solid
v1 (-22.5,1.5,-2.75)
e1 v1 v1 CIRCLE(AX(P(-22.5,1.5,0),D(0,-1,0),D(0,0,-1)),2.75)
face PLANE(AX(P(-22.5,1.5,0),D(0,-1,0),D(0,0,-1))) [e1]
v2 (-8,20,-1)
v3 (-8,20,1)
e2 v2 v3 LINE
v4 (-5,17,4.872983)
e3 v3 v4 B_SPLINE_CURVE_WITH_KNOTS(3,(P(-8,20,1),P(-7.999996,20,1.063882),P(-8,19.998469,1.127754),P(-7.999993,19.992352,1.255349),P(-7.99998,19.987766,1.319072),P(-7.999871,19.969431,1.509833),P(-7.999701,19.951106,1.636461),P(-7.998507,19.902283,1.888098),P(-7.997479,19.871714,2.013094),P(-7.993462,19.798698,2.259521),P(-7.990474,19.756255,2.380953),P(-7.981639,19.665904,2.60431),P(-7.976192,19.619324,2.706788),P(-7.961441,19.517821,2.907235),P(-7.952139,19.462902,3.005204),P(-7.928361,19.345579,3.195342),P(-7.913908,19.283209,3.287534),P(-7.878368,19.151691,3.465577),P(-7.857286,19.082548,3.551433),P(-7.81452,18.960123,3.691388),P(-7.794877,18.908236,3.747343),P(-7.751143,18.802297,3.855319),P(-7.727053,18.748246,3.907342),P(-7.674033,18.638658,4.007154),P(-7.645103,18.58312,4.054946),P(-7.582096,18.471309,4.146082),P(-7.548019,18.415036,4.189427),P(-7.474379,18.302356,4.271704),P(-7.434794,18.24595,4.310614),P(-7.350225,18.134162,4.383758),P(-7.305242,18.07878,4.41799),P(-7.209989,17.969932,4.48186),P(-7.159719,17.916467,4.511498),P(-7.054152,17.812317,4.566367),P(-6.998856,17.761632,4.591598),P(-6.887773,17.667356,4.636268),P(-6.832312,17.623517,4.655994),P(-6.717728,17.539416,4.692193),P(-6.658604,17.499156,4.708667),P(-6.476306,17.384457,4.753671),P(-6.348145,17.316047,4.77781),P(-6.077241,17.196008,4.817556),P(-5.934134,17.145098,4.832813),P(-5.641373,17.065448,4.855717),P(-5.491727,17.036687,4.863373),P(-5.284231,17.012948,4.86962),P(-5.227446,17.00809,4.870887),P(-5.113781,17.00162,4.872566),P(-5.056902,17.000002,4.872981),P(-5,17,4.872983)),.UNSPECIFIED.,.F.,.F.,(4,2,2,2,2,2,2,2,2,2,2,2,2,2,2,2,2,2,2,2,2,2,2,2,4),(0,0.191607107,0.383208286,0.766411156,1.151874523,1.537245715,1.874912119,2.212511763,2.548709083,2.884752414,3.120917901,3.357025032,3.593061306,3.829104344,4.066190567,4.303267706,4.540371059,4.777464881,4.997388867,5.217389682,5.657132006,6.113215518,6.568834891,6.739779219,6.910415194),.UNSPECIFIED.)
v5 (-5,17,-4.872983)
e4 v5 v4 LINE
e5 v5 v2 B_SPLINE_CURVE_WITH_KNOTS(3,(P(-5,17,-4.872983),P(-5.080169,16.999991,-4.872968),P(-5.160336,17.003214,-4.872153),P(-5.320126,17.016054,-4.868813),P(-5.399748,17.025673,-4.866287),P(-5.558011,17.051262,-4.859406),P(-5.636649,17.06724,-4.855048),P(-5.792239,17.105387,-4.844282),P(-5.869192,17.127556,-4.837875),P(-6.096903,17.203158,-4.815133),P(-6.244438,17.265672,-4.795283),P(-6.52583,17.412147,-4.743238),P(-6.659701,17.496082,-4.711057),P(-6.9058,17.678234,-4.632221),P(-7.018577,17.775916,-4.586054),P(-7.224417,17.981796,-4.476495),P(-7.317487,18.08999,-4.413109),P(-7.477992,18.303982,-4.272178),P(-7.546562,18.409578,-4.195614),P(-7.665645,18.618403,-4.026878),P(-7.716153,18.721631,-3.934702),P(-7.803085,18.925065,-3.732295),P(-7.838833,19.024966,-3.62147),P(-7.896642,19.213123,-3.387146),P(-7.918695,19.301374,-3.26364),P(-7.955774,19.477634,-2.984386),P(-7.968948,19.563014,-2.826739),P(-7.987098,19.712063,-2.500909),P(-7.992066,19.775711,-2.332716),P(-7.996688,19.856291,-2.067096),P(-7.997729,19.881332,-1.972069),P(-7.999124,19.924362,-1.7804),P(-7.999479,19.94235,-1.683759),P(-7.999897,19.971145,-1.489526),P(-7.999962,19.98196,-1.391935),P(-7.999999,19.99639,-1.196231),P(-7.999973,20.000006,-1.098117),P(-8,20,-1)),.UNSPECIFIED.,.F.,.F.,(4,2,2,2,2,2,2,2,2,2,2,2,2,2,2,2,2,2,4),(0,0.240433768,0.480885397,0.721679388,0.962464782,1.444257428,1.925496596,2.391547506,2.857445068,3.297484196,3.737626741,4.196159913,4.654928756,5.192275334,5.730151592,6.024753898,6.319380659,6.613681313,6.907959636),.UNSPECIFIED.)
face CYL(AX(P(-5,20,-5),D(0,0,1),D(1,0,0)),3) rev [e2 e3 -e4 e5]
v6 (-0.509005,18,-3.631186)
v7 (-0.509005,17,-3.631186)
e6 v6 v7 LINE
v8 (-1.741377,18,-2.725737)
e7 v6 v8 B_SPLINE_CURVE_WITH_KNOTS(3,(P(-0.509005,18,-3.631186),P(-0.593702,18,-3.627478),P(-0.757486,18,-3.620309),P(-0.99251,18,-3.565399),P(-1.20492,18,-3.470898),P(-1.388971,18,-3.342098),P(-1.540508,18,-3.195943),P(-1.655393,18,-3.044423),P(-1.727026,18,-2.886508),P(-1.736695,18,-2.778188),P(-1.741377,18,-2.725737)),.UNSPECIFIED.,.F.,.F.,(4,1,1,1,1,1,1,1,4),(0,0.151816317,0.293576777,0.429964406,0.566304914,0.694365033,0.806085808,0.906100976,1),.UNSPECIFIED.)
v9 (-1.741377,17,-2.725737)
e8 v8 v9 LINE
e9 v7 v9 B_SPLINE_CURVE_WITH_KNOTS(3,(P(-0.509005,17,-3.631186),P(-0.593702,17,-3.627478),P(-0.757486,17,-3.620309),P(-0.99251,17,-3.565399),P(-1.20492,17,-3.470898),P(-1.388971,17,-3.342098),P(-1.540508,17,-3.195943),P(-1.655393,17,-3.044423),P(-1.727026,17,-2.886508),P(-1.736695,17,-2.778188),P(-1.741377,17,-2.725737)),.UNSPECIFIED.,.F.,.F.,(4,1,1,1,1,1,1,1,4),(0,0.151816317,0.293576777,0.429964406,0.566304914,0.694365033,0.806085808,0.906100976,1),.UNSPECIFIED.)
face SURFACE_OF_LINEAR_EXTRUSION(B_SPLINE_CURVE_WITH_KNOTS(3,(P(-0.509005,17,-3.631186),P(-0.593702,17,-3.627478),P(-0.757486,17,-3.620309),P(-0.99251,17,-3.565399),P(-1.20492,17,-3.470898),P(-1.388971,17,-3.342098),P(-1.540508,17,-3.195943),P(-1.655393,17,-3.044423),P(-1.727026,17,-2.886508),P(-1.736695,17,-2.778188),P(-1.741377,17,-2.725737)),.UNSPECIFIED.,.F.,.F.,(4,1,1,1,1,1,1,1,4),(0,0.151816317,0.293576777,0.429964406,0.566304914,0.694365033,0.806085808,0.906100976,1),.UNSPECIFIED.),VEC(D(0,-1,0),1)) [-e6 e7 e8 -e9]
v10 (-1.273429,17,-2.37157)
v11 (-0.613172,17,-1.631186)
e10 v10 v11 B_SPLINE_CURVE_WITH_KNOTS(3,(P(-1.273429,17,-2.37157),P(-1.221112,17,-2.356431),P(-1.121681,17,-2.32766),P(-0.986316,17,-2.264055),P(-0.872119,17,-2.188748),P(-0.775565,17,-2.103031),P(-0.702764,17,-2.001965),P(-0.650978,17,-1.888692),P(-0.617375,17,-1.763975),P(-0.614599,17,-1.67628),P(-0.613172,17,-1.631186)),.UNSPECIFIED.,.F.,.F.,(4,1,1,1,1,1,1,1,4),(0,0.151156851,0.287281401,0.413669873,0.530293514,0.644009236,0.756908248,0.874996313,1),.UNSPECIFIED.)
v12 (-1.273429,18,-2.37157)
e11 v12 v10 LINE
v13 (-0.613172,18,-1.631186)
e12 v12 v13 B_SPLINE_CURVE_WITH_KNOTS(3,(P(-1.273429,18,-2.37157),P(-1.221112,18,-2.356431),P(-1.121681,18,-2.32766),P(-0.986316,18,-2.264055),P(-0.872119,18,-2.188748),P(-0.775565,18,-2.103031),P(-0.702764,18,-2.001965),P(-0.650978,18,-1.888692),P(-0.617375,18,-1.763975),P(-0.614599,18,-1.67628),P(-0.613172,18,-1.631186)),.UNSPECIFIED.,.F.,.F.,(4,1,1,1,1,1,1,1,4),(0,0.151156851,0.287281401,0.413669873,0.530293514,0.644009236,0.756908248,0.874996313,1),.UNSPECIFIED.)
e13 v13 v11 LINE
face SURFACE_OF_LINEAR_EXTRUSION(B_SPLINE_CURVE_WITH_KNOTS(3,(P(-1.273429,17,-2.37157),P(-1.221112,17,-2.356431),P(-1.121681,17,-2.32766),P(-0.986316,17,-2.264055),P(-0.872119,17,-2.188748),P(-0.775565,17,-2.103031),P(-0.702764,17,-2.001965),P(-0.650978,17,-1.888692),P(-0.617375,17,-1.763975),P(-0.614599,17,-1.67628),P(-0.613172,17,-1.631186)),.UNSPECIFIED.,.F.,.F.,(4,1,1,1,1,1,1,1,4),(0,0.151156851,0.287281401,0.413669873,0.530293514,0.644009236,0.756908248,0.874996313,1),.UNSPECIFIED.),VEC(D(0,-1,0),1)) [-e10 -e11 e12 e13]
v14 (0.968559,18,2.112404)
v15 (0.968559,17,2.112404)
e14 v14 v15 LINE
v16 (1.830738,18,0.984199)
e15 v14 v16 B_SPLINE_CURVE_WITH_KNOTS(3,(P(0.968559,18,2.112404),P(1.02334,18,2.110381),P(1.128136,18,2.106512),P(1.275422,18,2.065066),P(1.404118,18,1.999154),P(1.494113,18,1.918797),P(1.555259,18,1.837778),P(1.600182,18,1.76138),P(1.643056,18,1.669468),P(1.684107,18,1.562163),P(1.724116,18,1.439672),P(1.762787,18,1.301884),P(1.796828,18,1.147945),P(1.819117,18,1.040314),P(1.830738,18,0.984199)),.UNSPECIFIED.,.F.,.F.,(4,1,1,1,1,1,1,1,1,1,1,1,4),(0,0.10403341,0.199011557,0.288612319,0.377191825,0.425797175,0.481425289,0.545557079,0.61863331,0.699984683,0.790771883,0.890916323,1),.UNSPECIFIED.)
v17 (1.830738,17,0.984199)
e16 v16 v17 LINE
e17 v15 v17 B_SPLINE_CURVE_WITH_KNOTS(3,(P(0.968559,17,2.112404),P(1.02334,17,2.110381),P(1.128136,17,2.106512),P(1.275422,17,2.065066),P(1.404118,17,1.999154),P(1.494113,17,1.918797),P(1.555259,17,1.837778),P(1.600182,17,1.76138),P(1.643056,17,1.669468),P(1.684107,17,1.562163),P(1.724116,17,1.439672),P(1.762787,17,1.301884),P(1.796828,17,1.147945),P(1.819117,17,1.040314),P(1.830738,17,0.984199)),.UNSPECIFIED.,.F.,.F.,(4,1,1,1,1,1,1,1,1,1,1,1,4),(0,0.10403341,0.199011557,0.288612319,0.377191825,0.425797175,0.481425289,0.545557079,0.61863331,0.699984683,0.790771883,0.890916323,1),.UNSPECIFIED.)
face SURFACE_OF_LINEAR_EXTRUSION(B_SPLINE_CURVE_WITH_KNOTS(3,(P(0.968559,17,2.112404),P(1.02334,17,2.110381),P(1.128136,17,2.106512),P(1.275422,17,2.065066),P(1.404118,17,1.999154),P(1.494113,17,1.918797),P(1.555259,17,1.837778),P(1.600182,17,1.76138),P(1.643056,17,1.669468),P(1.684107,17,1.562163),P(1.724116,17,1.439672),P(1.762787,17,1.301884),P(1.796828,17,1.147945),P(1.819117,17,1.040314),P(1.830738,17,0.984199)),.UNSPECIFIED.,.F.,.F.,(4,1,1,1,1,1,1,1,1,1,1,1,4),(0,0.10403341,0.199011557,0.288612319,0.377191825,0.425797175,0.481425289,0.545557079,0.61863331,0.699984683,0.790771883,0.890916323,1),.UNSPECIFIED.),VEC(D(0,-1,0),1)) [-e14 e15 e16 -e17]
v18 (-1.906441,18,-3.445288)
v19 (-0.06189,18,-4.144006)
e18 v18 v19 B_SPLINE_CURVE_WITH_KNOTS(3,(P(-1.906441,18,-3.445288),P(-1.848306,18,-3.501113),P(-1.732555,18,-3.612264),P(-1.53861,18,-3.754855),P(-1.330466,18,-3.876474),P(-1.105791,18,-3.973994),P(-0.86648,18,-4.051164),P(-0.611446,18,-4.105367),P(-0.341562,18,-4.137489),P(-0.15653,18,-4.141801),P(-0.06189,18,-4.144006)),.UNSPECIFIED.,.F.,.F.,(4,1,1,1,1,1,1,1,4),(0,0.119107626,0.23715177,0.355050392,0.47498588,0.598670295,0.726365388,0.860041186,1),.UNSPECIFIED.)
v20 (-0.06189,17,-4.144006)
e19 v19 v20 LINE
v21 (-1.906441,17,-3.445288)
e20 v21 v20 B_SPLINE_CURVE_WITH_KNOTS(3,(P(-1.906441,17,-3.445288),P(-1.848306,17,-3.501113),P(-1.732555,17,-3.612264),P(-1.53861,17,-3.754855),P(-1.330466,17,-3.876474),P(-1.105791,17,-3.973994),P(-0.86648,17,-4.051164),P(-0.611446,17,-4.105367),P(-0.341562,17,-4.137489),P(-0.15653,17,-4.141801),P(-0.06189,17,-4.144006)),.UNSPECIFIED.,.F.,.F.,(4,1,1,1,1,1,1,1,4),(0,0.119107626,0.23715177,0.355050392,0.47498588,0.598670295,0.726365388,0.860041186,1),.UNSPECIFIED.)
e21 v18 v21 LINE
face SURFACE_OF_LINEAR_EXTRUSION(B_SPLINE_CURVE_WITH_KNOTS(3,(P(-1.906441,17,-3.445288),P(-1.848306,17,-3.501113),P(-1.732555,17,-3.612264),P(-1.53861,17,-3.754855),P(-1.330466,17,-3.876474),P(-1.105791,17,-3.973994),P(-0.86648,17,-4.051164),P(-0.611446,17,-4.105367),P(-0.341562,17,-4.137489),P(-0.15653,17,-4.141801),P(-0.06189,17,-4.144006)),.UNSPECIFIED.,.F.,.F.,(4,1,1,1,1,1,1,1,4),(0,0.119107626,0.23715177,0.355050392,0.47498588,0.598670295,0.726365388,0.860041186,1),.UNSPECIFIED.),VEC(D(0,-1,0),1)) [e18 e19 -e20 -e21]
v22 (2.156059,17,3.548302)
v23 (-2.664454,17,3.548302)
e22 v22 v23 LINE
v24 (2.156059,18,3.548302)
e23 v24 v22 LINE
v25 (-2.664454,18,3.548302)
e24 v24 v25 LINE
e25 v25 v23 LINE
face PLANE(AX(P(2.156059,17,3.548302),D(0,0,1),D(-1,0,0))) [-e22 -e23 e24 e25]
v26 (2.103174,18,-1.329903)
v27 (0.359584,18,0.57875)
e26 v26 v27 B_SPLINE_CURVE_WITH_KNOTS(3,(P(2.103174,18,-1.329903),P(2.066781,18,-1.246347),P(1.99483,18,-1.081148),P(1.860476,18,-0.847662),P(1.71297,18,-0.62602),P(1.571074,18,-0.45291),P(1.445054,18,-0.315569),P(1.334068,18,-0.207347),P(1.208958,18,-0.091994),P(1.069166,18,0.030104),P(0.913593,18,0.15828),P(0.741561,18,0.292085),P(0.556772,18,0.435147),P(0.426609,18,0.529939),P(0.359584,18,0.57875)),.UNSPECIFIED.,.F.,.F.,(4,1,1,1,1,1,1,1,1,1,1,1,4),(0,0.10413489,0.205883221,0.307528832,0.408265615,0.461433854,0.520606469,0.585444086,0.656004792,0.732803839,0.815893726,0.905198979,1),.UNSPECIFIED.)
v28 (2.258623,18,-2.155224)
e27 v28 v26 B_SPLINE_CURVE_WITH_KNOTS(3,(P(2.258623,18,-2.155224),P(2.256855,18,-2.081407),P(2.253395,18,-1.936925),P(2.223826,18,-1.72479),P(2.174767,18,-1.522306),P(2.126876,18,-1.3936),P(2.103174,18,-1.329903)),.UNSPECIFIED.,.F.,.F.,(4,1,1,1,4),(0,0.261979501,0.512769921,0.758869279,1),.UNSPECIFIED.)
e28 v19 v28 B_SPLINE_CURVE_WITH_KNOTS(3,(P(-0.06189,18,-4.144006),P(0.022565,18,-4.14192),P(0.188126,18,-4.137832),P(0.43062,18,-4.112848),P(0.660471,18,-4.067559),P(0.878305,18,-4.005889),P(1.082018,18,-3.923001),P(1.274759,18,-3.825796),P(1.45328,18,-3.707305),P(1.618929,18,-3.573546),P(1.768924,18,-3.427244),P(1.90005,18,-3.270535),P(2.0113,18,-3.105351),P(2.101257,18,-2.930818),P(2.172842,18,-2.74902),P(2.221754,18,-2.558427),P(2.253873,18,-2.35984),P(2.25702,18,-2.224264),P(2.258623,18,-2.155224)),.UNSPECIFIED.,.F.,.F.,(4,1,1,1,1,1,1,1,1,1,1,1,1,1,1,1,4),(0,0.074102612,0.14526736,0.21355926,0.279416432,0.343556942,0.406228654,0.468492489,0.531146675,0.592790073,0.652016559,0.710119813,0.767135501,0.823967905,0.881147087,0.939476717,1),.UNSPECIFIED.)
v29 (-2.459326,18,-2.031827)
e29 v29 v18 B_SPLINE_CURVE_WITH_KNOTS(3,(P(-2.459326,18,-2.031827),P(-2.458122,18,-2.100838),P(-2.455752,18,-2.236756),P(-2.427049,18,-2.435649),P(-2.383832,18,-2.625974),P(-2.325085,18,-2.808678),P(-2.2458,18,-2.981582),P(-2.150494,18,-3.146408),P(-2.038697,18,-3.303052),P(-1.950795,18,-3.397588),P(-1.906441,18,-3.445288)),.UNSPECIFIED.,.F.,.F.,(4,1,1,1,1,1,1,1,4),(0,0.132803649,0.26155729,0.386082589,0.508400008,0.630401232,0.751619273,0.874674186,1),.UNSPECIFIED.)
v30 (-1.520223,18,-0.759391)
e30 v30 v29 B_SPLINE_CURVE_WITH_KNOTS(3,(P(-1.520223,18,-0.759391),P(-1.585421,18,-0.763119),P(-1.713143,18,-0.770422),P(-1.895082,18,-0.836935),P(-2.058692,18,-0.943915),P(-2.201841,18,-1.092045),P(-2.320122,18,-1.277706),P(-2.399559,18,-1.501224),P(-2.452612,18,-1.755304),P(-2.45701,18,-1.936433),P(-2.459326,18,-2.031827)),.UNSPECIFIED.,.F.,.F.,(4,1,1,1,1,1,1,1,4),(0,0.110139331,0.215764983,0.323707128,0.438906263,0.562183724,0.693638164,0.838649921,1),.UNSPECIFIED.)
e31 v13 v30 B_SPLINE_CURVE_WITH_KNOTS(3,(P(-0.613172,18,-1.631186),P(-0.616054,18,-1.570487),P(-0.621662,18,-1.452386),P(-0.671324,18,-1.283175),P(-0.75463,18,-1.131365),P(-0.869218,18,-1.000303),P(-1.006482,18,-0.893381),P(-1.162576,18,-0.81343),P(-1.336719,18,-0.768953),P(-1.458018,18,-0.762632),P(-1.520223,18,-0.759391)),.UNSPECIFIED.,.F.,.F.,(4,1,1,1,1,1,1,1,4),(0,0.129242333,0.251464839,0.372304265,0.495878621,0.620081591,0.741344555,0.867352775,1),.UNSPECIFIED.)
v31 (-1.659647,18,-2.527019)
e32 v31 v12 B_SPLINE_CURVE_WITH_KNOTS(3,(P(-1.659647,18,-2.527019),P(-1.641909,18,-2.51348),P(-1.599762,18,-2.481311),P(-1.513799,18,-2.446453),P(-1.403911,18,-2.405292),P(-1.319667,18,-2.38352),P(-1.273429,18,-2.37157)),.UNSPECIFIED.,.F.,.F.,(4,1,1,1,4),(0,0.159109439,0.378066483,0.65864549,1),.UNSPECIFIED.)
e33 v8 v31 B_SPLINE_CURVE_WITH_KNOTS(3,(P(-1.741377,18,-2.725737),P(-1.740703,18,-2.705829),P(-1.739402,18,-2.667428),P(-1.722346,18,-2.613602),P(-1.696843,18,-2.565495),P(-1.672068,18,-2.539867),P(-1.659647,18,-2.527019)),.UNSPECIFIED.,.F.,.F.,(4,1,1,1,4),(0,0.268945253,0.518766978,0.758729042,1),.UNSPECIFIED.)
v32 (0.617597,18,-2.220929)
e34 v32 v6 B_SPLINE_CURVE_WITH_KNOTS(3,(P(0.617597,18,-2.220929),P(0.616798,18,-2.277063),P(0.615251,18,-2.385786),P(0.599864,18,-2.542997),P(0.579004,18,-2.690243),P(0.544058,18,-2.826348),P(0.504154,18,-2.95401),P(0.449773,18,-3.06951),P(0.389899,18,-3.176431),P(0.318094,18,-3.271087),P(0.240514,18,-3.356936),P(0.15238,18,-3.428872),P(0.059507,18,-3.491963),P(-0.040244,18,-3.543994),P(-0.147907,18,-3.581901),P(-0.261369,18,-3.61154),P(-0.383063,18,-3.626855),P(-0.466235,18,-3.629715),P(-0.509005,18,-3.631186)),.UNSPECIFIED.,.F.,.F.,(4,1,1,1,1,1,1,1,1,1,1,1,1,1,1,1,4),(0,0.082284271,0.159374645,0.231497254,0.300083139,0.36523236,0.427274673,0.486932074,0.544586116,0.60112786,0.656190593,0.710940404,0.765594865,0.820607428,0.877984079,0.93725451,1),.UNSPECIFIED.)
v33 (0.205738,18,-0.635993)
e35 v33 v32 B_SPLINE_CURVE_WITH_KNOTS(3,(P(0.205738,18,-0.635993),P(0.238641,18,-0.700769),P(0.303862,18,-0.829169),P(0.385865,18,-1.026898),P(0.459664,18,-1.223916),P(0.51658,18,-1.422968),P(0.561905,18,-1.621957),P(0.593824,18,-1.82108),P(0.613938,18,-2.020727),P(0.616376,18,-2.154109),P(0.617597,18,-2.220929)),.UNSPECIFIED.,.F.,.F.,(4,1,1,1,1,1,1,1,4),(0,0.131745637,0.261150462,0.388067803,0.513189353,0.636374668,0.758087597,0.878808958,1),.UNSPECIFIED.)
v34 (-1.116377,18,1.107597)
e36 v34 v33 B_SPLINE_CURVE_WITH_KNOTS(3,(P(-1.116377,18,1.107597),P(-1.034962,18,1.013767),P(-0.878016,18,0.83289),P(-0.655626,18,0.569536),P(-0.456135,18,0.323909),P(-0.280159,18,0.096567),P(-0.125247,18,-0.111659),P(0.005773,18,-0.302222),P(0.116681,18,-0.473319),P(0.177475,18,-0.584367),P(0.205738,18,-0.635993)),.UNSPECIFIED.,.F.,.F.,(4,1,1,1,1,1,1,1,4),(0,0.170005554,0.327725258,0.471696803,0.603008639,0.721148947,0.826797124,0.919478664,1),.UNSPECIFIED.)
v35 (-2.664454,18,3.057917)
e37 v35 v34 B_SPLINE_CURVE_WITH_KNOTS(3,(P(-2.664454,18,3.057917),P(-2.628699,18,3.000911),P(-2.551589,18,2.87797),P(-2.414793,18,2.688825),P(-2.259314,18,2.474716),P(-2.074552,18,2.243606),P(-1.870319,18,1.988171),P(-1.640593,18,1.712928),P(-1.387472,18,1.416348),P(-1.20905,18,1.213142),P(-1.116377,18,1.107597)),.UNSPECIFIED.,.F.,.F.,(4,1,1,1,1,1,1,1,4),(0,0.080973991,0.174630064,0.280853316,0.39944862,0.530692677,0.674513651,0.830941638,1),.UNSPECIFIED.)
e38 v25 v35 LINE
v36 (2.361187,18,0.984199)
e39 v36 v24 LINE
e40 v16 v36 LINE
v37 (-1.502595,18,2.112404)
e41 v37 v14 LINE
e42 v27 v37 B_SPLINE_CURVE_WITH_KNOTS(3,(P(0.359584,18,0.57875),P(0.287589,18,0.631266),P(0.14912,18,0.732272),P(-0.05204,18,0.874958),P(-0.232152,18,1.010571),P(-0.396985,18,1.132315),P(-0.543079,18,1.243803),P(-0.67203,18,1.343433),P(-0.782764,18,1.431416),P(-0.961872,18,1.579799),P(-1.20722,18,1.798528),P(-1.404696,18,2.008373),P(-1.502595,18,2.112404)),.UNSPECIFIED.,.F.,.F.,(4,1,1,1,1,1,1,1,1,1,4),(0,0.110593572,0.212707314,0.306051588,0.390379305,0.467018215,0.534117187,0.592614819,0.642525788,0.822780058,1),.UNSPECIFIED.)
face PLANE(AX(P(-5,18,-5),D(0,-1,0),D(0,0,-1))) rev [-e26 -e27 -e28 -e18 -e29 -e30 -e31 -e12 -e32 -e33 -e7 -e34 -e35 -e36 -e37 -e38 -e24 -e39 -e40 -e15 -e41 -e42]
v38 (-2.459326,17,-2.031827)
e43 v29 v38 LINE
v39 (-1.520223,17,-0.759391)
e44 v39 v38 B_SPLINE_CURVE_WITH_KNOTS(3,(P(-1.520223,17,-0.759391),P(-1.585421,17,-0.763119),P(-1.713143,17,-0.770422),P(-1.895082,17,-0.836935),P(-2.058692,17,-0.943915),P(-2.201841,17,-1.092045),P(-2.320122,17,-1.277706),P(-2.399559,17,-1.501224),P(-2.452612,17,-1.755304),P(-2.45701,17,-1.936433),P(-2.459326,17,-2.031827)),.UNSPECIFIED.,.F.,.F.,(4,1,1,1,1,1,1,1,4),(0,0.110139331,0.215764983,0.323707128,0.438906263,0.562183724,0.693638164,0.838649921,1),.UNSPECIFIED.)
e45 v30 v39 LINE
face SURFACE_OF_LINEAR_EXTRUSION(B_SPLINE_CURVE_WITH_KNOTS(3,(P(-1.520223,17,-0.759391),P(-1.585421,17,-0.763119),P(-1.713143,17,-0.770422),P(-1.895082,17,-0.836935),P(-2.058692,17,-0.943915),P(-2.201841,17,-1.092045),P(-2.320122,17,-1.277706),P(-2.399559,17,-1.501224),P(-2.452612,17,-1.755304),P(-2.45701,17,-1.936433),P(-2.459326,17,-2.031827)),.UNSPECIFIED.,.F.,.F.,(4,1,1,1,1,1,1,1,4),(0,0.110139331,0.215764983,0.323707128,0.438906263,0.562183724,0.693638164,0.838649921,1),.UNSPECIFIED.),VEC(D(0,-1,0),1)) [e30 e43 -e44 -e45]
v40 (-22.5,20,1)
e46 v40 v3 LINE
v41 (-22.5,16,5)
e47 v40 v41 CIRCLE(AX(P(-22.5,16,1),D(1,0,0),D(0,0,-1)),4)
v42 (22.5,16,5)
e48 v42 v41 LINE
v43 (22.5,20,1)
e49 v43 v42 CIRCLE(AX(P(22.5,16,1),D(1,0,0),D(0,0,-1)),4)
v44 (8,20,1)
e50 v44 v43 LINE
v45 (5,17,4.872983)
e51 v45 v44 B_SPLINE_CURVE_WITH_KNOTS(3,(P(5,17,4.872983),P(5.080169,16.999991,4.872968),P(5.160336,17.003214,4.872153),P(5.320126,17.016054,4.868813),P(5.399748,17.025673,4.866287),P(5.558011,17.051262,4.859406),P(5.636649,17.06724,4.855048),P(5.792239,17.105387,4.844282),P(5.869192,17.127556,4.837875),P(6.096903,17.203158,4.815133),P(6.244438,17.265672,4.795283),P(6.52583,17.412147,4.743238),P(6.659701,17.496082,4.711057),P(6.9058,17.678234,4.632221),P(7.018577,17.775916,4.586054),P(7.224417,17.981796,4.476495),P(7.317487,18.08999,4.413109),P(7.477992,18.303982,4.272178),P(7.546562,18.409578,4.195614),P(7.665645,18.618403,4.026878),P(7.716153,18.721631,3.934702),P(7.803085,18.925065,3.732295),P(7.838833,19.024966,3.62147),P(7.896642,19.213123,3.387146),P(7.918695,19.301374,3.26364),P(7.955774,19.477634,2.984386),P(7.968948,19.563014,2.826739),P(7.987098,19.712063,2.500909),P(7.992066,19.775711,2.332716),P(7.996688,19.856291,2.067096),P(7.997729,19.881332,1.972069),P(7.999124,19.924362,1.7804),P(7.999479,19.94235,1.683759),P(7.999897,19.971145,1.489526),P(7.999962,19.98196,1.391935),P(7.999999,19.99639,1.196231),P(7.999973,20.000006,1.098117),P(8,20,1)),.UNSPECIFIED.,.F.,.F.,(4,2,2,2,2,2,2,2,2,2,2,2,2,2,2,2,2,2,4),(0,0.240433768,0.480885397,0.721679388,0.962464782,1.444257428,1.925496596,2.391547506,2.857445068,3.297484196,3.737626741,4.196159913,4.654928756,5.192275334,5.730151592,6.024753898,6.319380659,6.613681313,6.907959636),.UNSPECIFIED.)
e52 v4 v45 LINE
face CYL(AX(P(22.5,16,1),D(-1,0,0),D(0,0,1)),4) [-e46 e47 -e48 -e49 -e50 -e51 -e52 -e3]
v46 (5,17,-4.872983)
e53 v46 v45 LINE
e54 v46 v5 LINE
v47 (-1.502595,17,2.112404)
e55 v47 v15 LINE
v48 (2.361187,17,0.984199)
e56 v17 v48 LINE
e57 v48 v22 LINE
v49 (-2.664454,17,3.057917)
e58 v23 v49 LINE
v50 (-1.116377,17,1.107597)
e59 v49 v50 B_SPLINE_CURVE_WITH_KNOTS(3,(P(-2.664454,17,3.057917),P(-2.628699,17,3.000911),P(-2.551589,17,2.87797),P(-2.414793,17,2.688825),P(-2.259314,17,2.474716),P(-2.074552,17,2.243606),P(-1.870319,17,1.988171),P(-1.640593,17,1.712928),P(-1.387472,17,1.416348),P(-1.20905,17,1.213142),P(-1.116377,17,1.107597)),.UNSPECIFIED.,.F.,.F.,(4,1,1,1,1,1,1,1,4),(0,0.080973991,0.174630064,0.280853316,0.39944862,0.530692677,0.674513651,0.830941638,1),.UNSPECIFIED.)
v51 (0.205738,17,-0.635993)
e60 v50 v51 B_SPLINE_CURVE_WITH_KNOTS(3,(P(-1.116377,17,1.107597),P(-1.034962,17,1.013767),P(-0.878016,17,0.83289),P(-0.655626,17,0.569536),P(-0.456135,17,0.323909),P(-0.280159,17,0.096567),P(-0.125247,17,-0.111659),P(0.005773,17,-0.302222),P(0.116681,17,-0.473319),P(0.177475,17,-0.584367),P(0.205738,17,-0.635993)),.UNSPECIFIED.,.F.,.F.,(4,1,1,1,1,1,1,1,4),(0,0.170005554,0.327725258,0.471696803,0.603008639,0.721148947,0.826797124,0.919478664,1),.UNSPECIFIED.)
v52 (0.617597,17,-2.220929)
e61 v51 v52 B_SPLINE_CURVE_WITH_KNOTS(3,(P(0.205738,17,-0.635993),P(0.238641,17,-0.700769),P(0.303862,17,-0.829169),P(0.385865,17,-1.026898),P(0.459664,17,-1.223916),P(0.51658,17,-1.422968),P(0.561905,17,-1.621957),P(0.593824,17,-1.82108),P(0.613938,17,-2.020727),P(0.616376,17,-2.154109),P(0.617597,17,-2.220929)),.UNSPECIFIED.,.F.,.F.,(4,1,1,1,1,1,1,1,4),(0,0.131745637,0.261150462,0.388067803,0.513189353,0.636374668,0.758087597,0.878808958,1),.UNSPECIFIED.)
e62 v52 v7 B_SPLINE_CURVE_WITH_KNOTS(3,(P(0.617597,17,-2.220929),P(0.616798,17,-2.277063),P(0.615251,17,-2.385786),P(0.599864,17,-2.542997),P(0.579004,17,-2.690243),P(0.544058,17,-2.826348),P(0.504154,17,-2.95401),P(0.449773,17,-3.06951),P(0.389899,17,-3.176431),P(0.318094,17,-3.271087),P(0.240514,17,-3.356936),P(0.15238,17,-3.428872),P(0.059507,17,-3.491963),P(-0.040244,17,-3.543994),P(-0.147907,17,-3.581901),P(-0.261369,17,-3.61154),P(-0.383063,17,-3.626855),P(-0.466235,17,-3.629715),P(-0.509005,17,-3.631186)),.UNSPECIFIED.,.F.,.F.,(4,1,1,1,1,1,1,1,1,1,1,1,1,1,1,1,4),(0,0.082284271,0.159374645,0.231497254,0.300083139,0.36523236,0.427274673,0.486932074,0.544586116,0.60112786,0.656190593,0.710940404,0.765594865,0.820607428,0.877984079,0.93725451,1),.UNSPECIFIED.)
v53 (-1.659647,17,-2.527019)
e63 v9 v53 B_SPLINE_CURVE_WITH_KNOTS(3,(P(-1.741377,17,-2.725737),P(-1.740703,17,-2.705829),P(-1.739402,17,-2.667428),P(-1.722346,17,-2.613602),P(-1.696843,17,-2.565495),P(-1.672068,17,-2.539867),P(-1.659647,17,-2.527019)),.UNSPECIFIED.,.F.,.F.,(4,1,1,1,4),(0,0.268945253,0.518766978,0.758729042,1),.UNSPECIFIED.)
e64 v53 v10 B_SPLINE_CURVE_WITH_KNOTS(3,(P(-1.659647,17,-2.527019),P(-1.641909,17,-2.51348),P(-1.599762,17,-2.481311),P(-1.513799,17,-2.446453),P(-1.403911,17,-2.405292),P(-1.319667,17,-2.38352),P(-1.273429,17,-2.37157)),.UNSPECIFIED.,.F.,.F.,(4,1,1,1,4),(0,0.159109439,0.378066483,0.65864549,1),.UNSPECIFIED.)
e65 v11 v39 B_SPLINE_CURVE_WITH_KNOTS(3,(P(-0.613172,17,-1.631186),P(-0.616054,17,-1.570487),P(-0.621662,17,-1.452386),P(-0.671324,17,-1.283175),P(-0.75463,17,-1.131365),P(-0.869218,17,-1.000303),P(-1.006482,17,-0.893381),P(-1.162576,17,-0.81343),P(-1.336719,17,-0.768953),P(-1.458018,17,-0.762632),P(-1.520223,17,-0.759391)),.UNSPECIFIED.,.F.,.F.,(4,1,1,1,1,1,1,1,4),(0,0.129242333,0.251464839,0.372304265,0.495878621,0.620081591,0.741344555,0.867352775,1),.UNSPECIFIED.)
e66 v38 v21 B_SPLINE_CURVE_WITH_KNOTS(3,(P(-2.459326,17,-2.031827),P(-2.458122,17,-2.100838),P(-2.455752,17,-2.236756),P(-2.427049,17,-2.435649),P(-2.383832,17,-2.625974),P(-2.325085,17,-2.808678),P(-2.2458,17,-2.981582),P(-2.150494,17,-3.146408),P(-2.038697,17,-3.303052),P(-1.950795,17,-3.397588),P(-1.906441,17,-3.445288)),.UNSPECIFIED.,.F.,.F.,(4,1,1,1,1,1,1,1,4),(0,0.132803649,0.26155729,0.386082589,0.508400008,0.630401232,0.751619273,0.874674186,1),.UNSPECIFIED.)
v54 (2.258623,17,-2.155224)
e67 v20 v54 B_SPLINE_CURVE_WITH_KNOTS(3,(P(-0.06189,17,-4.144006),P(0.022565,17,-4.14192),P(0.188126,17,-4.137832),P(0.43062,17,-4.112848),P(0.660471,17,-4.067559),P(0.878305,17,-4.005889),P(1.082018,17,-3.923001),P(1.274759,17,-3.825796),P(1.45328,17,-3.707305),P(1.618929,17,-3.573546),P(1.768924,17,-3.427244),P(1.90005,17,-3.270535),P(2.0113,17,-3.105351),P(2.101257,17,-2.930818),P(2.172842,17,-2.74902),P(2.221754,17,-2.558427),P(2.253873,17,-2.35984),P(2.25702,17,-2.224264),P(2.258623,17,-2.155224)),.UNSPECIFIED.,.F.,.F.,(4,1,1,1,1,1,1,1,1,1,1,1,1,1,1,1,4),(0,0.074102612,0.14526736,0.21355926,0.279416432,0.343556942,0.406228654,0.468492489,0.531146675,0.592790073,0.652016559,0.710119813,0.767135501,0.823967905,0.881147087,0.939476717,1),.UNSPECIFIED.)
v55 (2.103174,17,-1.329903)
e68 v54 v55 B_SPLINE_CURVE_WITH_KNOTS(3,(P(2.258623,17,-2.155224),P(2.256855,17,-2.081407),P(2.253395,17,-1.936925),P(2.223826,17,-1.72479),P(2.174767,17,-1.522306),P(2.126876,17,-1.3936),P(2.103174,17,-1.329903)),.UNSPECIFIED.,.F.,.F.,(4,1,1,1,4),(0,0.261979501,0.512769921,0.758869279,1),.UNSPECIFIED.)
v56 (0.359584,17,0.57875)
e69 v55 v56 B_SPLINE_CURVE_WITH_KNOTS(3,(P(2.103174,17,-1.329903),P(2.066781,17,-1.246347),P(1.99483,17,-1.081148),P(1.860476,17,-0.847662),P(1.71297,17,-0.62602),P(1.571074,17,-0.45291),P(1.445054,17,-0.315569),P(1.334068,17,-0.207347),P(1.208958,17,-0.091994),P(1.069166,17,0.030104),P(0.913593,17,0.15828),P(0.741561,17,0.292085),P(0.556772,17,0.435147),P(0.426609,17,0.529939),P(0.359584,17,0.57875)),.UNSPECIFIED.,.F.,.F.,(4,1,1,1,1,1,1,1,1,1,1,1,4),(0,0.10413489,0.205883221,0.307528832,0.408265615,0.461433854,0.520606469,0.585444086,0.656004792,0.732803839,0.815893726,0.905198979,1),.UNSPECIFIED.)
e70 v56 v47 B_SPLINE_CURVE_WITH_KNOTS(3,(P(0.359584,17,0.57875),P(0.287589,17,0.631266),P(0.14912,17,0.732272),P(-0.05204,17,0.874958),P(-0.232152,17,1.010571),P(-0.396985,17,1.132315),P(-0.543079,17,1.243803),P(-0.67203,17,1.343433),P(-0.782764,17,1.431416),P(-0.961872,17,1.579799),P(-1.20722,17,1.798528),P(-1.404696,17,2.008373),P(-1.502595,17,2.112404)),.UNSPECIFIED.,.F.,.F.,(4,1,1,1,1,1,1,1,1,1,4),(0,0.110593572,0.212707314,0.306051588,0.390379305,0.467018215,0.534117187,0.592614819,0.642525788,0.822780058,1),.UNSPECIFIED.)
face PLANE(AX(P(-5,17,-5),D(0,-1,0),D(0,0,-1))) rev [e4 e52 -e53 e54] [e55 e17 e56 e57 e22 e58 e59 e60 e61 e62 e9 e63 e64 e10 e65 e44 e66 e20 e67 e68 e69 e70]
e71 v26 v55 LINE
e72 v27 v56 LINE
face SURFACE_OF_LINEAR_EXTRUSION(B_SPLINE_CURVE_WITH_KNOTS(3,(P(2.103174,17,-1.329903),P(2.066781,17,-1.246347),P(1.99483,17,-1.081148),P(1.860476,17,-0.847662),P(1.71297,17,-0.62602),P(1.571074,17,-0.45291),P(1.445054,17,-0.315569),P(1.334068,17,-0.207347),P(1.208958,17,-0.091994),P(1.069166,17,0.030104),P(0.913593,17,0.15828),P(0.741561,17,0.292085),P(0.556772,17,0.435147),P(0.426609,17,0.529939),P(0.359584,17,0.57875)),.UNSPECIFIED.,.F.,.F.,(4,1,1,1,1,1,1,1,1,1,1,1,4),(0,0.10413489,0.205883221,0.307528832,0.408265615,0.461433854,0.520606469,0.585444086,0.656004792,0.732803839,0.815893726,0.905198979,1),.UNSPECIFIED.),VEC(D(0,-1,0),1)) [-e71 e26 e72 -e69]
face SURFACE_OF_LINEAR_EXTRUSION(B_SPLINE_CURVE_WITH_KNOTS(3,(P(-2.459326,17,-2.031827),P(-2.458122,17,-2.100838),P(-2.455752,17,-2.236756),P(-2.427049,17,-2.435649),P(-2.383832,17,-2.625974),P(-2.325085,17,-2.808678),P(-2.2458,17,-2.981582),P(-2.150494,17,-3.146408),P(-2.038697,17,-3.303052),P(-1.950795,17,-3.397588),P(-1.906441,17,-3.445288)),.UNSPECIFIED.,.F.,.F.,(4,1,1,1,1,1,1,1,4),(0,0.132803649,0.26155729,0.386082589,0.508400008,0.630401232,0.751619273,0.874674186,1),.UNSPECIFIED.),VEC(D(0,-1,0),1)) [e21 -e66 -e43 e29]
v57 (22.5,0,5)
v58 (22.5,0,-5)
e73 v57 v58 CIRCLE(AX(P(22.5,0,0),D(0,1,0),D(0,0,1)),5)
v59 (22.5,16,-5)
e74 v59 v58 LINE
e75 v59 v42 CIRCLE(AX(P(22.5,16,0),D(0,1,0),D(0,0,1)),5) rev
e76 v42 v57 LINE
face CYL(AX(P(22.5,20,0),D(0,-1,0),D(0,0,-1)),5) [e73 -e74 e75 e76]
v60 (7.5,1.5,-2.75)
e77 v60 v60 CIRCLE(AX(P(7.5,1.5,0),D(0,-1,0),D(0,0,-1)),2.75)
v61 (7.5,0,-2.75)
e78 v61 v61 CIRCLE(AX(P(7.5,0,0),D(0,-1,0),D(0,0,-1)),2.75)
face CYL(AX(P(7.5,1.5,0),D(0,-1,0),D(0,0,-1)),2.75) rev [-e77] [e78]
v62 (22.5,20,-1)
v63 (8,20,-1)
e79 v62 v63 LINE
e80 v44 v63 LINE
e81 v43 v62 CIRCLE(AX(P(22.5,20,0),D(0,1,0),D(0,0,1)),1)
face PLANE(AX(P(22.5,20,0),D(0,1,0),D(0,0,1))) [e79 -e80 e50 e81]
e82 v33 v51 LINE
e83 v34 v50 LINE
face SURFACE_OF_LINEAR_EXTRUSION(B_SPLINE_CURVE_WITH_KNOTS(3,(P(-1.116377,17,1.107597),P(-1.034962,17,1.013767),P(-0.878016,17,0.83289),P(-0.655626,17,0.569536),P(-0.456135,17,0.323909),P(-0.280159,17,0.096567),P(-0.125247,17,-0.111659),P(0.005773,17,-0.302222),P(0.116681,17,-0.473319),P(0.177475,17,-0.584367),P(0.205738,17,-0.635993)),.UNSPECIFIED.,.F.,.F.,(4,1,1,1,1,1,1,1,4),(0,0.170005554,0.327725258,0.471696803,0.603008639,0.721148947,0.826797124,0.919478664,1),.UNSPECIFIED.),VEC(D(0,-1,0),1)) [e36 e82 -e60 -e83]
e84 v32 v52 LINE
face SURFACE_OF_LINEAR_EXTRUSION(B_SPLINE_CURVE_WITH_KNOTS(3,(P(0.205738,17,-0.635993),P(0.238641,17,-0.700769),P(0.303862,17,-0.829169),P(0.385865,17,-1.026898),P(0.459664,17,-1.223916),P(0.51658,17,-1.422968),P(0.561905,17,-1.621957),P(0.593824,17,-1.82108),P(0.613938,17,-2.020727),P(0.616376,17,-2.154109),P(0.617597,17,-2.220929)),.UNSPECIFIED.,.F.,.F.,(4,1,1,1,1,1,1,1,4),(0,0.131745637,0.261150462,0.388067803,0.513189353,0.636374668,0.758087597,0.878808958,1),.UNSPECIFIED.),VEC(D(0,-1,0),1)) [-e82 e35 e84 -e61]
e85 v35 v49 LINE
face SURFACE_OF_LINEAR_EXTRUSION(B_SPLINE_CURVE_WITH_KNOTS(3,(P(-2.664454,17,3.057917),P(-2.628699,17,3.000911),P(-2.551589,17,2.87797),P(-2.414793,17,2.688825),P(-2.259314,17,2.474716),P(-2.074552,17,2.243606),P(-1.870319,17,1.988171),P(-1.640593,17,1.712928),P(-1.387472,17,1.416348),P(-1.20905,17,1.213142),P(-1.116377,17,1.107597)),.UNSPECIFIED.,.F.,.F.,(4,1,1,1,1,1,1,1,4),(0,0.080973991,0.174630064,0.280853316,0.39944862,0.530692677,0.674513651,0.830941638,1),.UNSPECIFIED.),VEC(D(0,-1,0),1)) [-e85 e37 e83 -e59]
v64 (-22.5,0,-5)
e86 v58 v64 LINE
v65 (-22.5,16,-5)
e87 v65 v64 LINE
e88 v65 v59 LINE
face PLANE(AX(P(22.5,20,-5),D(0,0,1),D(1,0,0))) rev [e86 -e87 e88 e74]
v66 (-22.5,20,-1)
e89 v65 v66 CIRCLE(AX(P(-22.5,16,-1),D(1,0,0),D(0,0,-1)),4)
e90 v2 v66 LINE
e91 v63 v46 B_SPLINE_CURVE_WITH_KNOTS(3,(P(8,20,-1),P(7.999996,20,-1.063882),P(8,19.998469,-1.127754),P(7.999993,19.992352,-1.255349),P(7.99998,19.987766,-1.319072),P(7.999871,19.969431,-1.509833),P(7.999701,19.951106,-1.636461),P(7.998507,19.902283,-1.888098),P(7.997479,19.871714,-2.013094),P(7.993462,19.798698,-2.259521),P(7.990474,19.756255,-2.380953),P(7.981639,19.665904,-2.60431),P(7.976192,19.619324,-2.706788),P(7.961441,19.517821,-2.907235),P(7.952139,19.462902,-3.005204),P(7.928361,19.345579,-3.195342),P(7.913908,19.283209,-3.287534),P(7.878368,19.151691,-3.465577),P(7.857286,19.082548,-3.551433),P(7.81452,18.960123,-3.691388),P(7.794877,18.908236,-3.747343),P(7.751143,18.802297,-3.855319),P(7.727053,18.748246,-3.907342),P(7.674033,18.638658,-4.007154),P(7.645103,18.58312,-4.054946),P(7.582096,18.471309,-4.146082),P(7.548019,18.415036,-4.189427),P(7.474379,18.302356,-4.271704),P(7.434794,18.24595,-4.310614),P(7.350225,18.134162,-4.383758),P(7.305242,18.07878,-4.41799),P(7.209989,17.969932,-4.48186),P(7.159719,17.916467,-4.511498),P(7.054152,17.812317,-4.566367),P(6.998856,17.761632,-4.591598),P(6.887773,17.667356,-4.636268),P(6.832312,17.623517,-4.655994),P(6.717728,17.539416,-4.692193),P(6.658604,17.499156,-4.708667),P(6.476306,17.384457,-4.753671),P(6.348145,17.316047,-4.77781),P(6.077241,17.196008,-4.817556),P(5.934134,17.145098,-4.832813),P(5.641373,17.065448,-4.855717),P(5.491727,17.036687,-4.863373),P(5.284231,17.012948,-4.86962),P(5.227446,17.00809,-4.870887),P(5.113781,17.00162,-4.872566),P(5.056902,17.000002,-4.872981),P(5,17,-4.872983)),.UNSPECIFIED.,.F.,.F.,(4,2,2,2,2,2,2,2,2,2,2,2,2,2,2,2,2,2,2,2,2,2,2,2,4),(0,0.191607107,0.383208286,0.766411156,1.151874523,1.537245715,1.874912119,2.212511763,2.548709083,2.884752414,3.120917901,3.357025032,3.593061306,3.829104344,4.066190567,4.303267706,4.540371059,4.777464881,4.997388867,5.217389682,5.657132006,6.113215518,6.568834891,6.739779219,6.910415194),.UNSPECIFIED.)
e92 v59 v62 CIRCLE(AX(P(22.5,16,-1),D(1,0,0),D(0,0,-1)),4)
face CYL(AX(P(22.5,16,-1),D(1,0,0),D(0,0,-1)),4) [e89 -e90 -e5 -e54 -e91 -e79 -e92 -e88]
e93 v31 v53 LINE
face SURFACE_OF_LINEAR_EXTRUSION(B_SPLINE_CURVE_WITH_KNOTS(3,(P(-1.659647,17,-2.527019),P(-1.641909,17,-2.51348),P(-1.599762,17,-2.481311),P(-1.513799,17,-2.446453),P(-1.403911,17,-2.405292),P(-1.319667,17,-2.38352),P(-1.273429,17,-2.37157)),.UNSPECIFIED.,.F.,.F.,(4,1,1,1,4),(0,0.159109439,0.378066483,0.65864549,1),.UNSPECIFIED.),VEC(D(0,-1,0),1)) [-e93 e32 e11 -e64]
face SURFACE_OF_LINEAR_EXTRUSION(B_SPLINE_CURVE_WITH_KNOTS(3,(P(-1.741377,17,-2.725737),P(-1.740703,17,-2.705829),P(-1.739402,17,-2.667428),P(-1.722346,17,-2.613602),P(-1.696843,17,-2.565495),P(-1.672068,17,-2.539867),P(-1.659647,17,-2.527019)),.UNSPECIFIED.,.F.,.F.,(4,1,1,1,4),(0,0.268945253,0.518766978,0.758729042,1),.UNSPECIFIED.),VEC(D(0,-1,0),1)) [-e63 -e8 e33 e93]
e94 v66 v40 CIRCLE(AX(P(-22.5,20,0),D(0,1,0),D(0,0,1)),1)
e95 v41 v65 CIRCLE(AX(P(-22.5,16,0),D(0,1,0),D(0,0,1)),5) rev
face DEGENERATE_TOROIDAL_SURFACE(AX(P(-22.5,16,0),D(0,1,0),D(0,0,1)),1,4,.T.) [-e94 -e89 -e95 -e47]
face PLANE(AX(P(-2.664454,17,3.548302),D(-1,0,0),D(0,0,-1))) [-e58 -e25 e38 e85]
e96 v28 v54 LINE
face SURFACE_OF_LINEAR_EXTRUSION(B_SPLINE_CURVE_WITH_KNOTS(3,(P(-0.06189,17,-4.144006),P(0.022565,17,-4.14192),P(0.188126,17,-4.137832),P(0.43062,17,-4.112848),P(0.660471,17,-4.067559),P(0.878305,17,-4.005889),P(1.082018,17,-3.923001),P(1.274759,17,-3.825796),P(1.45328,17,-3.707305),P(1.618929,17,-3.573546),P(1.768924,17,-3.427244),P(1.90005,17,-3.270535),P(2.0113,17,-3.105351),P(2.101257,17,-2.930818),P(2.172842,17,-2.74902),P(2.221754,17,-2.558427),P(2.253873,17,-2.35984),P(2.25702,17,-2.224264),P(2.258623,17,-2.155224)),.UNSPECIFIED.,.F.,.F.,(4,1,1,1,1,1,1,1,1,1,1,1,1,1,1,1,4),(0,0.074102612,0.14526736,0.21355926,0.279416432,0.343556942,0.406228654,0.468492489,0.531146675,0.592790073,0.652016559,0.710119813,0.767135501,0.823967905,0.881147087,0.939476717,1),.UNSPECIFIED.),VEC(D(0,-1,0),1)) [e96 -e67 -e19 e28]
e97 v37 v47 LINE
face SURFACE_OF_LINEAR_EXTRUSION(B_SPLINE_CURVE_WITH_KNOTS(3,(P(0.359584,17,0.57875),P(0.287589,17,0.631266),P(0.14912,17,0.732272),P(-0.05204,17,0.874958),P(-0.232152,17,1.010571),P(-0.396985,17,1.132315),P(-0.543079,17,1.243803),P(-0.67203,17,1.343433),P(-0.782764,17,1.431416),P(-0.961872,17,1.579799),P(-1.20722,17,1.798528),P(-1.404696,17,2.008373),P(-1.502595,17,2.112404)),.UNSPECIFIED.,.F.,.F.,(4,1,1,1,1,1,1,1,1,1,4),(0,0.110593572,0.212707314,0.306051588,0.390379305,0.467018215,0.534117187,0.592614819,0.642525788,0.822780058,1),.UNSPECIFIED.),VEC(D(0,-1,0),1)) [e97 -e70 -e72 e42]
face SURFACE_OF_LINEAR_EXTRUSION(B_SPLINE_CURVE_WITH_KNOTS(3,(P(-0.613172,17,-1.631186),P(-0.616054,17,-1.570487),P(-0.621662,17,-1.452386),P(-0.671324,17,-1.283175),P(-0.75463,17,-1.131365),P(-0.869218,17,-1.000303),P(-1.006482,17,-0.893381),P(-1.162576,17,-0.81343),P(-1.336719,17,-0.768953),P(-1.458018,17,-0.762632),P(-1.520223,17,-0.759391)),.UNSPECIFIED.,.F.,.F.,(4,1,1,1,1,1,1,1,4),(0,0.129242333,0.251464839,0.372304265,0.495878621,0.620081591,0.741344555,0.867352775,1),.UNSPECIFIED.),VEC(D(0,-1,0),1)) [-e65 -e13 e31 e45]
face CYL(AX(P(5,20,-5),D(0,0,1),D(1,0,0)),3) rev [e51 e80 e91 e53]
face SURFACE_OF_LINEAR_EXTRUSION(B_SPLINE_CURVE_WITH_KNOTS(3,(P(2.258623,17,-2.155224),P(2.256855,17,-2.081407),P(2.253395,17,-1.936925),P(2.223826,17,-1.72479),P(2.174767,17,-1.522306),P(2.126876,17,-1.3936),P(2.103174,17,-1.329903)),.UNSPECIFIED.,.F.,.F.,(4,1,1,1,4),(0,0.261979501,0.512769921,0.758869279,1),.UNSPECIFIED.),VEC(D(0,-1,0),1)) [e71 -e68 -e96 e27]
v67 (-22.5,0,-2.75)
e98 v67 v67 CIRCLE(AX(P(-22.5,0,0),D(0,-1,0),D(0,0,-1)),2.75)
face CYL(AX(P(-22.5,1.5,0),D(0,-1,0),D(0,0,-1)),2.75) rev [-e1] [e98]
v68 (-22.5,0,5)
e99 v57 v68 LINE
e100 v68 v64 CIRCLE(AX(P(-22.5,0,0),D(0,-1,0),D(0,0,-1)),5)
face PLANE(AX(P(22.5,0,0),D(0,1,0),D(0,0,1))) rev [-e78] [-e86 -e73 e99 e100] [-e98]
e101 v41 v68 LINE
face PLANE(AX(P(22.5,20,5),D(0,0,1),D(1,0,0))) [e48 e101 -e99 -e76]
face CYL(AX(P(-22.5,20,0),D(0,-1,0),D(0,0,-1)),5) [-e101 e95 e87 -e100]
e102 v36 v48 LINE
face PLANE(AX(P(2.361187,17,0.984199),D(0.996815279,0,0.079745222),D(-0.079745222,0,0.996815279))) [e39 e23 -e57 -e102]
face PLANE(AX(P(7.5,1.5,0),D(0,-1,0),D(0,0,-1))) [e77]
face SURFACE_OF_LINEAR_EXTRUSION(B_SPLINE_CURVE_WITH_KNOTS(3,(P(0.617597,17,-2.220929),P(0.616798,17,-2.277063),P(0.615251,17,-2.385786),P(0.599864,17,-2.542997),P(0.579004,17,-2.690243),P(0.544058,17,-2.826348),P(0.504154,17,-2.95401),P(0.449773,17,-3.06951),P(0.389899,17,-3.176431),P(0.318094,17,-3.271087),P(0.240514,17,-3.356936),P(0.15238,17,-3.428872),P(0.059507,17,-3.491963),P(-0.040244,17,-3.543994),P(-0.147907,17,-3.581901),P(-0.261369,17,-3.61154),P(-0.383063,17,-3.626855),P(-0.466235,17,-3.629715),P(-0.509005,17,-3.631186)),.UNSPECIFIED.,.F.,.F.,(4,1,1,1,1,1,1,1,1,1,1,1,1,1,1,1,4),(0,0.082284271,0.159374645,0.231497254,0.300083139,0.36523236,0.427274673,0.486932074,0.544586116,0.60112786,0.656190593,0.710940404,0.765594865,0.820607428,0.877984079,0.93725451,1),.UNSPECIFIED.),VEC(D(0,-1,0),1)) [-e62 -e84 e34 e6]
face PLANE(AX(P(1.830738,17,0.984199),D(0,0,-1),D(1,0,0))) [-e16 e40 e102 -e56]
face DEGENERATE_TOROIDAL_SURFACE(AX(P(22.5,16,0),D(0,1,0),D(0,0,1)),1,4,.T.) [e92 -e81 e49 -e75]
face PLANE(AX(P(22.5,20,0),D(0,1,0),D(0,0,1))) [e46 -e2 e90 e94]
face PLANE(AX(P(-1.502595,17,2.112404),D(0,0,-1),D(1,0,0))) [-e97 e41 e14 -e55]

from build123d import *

# Parameters (mm, degrees)
BOSS_EXTRUDE1_DEPTH     = 20
FILLET1_R               = 4
SKETCH2_R               = 2.75
CUT_EXTRUDE1_DEPTH      = 1.5
LPATTERN1_COUNT         = 2
LPATTERN1_PITCH         = 30
CUT_EXTRUDE2_DEPTH      = 35.369317712
CUT_EXTRUDE2_DEPTH_BACK = 35.369317712
WRAP1_DEPTH             = 1


# Read off the part's stored shape, not the designer's step: Wrap1
with BuildPart() as part:
    # Sketch1 → Boss-Extrude1 (new body)
    with BuildSketch(Plane(origin=(0, 0, 0), x_dir=(1, 0, 0), z_dir=(0, 1, 0))):
        with BuildLine():
            Line((22.5, -5), (-22.5, -5))
            ThreePointArc((-22.5, -5), (-27.5, 0), (-22.5, 5))
            Line((-22.5, 5), (22.5, 5))
            ThreePointArc((22.5, 5), (27.5, 0), (22.5, -5))
        make_face()
    extrude(amount=BOSS_EXTRUDE1_DEPTH)

    # Fillet1
    fillet1_edges = [part.edges().sort_by_distance(p)[0] for p in [
        (-27.5, 20, 0),
        (0, 20, 5),
        (27.5, 20, 0),
        (0, 20, -5),
    ]]
    fillet(fillet1_edges, radius=FILLET1_R)

    # Sketch2 → Cut-Extrude1 (cut)
    with BuildSketch(Plane.XZ):
        with Locations(Location((-22.5, 0, 0), (0, 0, 270))):
            Circle(SKETCH2_R)
    cut_extrude1 = extrude(amount=-CUT_EXTRUDE1_DEPTH, mode=Mode.SUBTRACT)

    # LPattern1: Cut-Extrude1 ×2
    with Locations(*[(i * LPATTERN1_PITCH, 0, 0) for i in range(1, LPATTERN1_COUNT)]):
        add(cut_extrude1, mode=Mode.SUBTRACT)

    # Sketch3 → Cut-Extrude2 (cut, two sides: drawn at the far end of the back side and taken through both)
    with BuildSketch(Plane.XY.offset(-CUT_EXTRUDE2_DEPTH_BACK)):
        with BuildLine():
            Line((-5, 23), (5, 23))
            ThreePointArc((5, 23), (8, 20), (5, 17))
            Line((5, 17), (-5, 17))
            ThreePointArc((-5, 17), (-8, 20), (-5, 23))
        make_face()
    extrude(amount=CUT_EXTRUDE2_DEPTH + CUT_EXTRUDE2_DEPTH_BACK, mode=Mode.SUBTRACT)

    # Wrap1 outline → Wrap1 (add)
    with BuildSketch(Plane(origin=(0, 17, 0), x_dir=(1, 0, 0), z_dir=(0, 1, 0))):
        with BuildLine():
            add(Edge.make_bspline(
                [(0.968558604, -2.112404227), (1.023340463, -2.110381468), (1.128135866, -2.106512015), (1.275421614, -2.065066433), (1.40411806, -1.999153831), (1.494113345, -1.918796765), (1.555259283, -1.8377784), (1.600182088, -1.761379971), (1.643056037, -1.669468115), (1.68410688, -1.562162987), (1.724115658, -1.439672484), (1.762787282, -1.301883834), (1.796828359, -1.147944523), (1.819117415, -1.040313742), (1.830738091, -0.984199098)],
                knots=[0, 0, 0, 0, 0.10403341, 0.199011557, 0.288612319, 0.377191825, 0.425797175, 0.481425289, 0.545557079, 0.61863331, 0.699984683, 0.790771883, 0.890916323, 1, 1, 1, 1], degree=3))
            Line((0.968558604, -2.112404227), (-1.502595242, -2.112404227))
            add(Edge.make_bspline(
                [(0.359584245, -0.57875038), (0.287589412, -0.631266446), (0.149119993, -0.732271876), (-0.052040125, -0.874957595), (-0.232151558, -1.010570949), (-0.396984875, -1.13231455), (-0.543079134, -1.243803459), (-0.672030163, -1.343433338), (-0.782764208, -1.43141572), (-0.961872458, -1.579798827), (-1.207220157, -1.798528227), (-1.40469562, -2.00837263), (-1.502595242, -2.112404227)],
                knots=[0, 0, 0, 0, 0.110593572, 0.212707314, 0.306051588, 0.390379305, 0.467018215, 0.534117187, 0.592614819, 0.642525788, 0.822780058, 1, 1, 1, 1], degree=3))
            add(Edge.make_bspline(
                [(2.103173989, 1.329903466), (2.066781163, 1.246346618), (1.99482956, 1.081147874), (1.86047631, 0.847661593), (1.71297016, 0.626020413), (1.571074283, 0.452909604), (1.445054335, 0.315568643), (1.334068385, 0.207346612), (1.208958187, 0.091994137), (1.069166496, -0.030104), (0.913592831, -0.158279882), (0.741560734, -0.29208501), (0.556771712, -0.435146764), (0.42660857, -0.529939289), (0.359584245, -0.57875038)],
                knots=[0, 0, 0, 0, 0.10413489, 0.205883221, 0.307528832, 0.408265615, 0.461433854, 0.520606469, 0.585444086, 0.656004792, 0.732803839, 0.815893726, 0.905198979, 1, 1, 1, 1], degree=3))
            add(Edge.make_bspline(
                [(2.258622707, 2.155223979), (2.256854974, 2.081406691), (2.253395008, 1.936924834), (2.223825952, 1.724789841), (2.174767432, 1.522306219), (2.126875674, 1.393600214), (2.103173989, 1.329903466)],
                knots=[0, 0, 0, 0, 0.261979501, 0.512769921, 0.758869279, 1, 1, 1, 1], degree=3))
            add(Edge.make_bspline(
                [(-0.061890114, 4.14400603), (0.022564629, 4.141920306), (0.18812583, 4.13783155), (0.430620451, 4.112847977), (0.660471364, 4.067558501), (0.878305178, 4.005888588), (1.082018473, 3.923000729), (1.274759097, 3.825795699), (1.453280397, 3.707304776), (1.618929442, 3.573545968), (1.768923738, 3.427244365), (1.900049838, 3.270535022), (2.011299511, 3.105351175), (2.101257211, 2.93081783), (2.172841542, 2.749020464), (2.221753805, 2.558426678), (2.253872753, 2.359840276), (2.257020026, 2.224263519), (2.258622707, 2.155223979)],
                knots=[0, 0, 0, 0, 0.074102612, 0.14526736, 0.21355926, 0.279416432, 0.343556942, 0.406228654, 0.468492489, 0.531146675, 0.592790073, 0.652016559, 0.710119813, 0.767135501, 0.823967905, 0.881147087, 0.939476717, 1, 1, 1, 1], degree=3))
            add(Edge.make_bspline(
                [(-1.906441396, 3.445288081), (-1.848306189, 3.501112989), (-1.732554849, 3.612264359), (-1.538609793, 3.754854821), (-1.330466242, 3.876473687), (-1.105791254, 3.973994027), (-0.866480346, 4.051164268), (-0.611446439, 4.105367467), (-0.341562002, 4.137488539), (-0.156530269, 4.14180053), (-0.061890114, 4.14400603)],
                knots=[0, 0, 0, 0, 0.119107626, 0.23715177, 0.355050392, 0.47498588, 0.598670295, 0.726365388, 0.860041186, 1, 1, 1, 1], degree=3))
            add(Edge.make_bspline(
                [(-2.459326011, 2.031826543), (-2.458122329, 2.10083777), (-2.455751672, 2.236755643), (-2.42704922, 2.435648535), (-2.383831572, 2.625974396), (-2.325084873, 2.808678323), (-2.245799792, 2.981581962), (-2.150493697, 3.146407777), (-2.038697096, 3.303051555), (-1.950794522, 3.397587797), (-1.906441396, 3.445288081)],
                knots=[0, 0, 0, 0, 0.132803649, 0.26155729, 0.386082589, 0.508400008, 0.630401232, 0.751619273, 0.874674186, 1, 1, 1, 1], degree=3))
            add(Edge.make_bspline(
                [(-1.520223447, 0.759390645), (-1.585420599, 0.763118791), (-1.713143024, 0.770422298), (-1.895082142, 0.836934937), (-2.058691576, 0.943915448), (-2.201841078, 1.092044894), (-2.320121913, 1.277705611), (-2.399559254, 1.501224402), (-2.452612405, 1.75530448), (-2.457009968, 1.936432658), (-2.459326011, 2.031826543)],
                knots=[0, 0, 0, 0, 0.110139331, 0.215764983, 0.323707128, 0.438906263, 0.562183724, 0.693638164, 0.838649921, 1, 1, 1, 1], degree=3))
            add(Edge.make_bspline(
                [(-0.613172165, 1.631185517), (-0.616054345, 1.570486701), (-0.621662157, 1.45238594), (-0.671323685, 1.283175242), (-0.754629801, 1.131365188), (-0.869218028, 1.000302814), (-1.00648217, 0.893380798), (-1.162575656, 0.81342959), (-1.336719307, 0.768952542), (-1.458017598, 0.762632021), (-1.520223447, 0.759390645)],
                knots=[0, 0, 0, 0, 0.129242333, 0.251464839, 0.372304265, 0.495878621, 0.620081591, 0.741344555, 0.867352775, 1, 1, 1, 1], degree=3))
            add(Edge.make_bspline(
                [(-1.273428575, 2.371570132), (-1.221111857, 2.356431424), (-1.121681232, 2.327659528), (-0.986315759, 2.264054818), (-0.872118751, 2.188748181), (-0.775565412, 2.103031066), (-0.702763657, 2.001965174), (-0.650977929, 1.888692008), (-0.61737495, 1.763975364), (-0.614599413, 1.676280399), (-0.613172165, 1.631185517)],
                knots=[0, 0, 0, 0, 0.151156851, 0.287281401, 0.413669873, 0.530293514, 0.644009236, 0.756908248, 0.874996313, 1, 1, 1, 1], degree=3))
            add(Edge.make_bspline(
                [(-1.659646524, 2.52701885), (-1.641908981, 2.5134804), (-1.599762076, 2.48131113), (-1.513799429, 2.446453071), (-1.403911325, 2.405291879), (-1.319666952, 2.383519902), (-1.273428575, 2.371570132)],
                knots=[0, 0, 0, 0, 0.159109439, 0.378066483, 0.65864549, 1, 1, 1, 1], degree=3))
            add(Edge.make_bspline(
                [(-1.741377293, 2.725736799), (-1.740702967, 2.705828636), (-1.739402264, 2.667427893), (-1.722346439, 2.613602242), (-1.696843256, 2.565494988), (-1.672067897, 2.539867464), (-1.659646524, 2.52701885)],
                knots=[0, 0, 0, 0, 0.268945253, 0.518766978, 0.758729042, 1, 1, 1, 1], degree=3))
            add(Edge.make_bspline(
                [(-0.509005498, 3.631185517), (-0.593702292, 3.627478268), (-0.757485819, 3.620309328), (-0.992510379, 3.565399378), (-1.204920463, 3.4708981), (-1.388970755, 3.342097951), (-1.54050767, 3.195942921), (-1.655393233, 3.044422755), (-1.727025811, 2.886507887), (-1.736695124, 2.778188345), (-1.741377293, 2.725736799)],
                knots=[0, 0, 0, 0, 0.151816317, 0.293576777, 0.429964406, 0.566304914, 0.694365033, 0.806085808, 0.906100976, 1, 1, 1, 1], degree=3))
            add(Edge.make_bspline(
                [(0.617597066, 2.220929107), (0.616798314, 2.277062503), (0.615251229, 2.385786079), (0.599863671, 2.542997259), (0.579004071, 2.690242583), (0.544058374, 2.826348498), (0.504153512, 2.954009696), (0.449772713, 3.069509609), (0.389899195, 3.176431124), (0.318093883, 3.271087373), (0.240513737, 3.356936451), (0.152380296, 3.428872442), (0.059506725, 3.491963217), (-0.040243661, 3.543993611), (-0.147906764, 3.581901434), (-0.261368703, 3.611540097), (-0.38306343, 3.626855058), (-0.466235221, 3.629714881), (-0.509005498, 3.631185517)],
                knots=[0, 0, 0, 0, 0.082284271, 0.159374645, 0.231497254, 0.300083139, 0.36523236, 0.427274673, 0.486932074, 0.544586116, 0.60112786, 0.656190593, 0.710940404, 0.765594865, 0.820607428, 0.877984079, 0.93725451, 1, 1, 1, 1], degree=3))
            add(Edge.make_bspline(
                [(0.205738091, 0.635993209), (0.238640814, 0.700768661), (0.303861654, 0.829168655), (0.385865127, 1.026897746), (0.459663901, 1.22391557), (0.516579645, 1.422967903), (0.561905142, 1.621957205), (0.593823909, 1.82108009), (0.613938148, 2.020726724), (0.616375849, 2.154108657), (0.617597066, 2.220929107)],
                knots=[0, 0, 0, 0, 0.131745637, 0.261150462, 0.388067803, 0.513189353, 0.636374668, 0.758087597, 0.878808958, 1, 1, 1, 1], degree=3))
            add(Edge.make_bspline(
                [(-1.116377293, -1.107596534), (-1.03496234, -1.013767374), (-0.878016077, -0.832889839), (-0.655626445, -0.569536189), (-0.456135085, -0.32390871), (-0.280159151, -0.096566641), (-0.125247461, 0.111659158), (0.00577288, 0.302221735), (0.116680709, 0.473318508), (0.177475044, 0.584367138), (0.205738091, 0.635993209)],
                knots=[0, 0, 0, 0, 0.170005554, 0.327725258, 0.471696803, 0.603008639, 0.721148947, 0.826797124, 0.919478664, 1, 1, 1, 1], degree=3))
            add(Edge.make_bspline(
                [(-2.664454216, -3.057917047), (-2.628698989, -3.000910883), (-2.55158858, -2.877970296), (-2.41479269, -2.688825323), (-2.259314405, -2.474715573), (-2.074551732, -2.243606397), (-1.870318919, -1.988170585), (-1.640593125, -1.712928149), (-1.387471618, -1.416348269), (-1.20904993, -1.213142224), (-1.116377293, -1.107596534)],
                knots=[0, 0, 0, 0, 0.080973991, 0.174630064, 0.280853316, 0.39944862, 0.530692677, 0.674513651, 0.830941638, 1, 1, 1, 1], degree=3))
            Line((-2.664454216, -3.057917047), (-2.664454216, -3.548301662))
            Line((-2.664454216, -3.548301662), (2.156058604, -3.548301662))
            Line((2.156058604, -3.548301662), (2.361186809, -0.984199098))
            Line((2.361186809, -0.984199098), (1.830738091, -0.984199098))
        make_face()
    extrude(amount=WRAP1_DEPTH)


solid = part.part
